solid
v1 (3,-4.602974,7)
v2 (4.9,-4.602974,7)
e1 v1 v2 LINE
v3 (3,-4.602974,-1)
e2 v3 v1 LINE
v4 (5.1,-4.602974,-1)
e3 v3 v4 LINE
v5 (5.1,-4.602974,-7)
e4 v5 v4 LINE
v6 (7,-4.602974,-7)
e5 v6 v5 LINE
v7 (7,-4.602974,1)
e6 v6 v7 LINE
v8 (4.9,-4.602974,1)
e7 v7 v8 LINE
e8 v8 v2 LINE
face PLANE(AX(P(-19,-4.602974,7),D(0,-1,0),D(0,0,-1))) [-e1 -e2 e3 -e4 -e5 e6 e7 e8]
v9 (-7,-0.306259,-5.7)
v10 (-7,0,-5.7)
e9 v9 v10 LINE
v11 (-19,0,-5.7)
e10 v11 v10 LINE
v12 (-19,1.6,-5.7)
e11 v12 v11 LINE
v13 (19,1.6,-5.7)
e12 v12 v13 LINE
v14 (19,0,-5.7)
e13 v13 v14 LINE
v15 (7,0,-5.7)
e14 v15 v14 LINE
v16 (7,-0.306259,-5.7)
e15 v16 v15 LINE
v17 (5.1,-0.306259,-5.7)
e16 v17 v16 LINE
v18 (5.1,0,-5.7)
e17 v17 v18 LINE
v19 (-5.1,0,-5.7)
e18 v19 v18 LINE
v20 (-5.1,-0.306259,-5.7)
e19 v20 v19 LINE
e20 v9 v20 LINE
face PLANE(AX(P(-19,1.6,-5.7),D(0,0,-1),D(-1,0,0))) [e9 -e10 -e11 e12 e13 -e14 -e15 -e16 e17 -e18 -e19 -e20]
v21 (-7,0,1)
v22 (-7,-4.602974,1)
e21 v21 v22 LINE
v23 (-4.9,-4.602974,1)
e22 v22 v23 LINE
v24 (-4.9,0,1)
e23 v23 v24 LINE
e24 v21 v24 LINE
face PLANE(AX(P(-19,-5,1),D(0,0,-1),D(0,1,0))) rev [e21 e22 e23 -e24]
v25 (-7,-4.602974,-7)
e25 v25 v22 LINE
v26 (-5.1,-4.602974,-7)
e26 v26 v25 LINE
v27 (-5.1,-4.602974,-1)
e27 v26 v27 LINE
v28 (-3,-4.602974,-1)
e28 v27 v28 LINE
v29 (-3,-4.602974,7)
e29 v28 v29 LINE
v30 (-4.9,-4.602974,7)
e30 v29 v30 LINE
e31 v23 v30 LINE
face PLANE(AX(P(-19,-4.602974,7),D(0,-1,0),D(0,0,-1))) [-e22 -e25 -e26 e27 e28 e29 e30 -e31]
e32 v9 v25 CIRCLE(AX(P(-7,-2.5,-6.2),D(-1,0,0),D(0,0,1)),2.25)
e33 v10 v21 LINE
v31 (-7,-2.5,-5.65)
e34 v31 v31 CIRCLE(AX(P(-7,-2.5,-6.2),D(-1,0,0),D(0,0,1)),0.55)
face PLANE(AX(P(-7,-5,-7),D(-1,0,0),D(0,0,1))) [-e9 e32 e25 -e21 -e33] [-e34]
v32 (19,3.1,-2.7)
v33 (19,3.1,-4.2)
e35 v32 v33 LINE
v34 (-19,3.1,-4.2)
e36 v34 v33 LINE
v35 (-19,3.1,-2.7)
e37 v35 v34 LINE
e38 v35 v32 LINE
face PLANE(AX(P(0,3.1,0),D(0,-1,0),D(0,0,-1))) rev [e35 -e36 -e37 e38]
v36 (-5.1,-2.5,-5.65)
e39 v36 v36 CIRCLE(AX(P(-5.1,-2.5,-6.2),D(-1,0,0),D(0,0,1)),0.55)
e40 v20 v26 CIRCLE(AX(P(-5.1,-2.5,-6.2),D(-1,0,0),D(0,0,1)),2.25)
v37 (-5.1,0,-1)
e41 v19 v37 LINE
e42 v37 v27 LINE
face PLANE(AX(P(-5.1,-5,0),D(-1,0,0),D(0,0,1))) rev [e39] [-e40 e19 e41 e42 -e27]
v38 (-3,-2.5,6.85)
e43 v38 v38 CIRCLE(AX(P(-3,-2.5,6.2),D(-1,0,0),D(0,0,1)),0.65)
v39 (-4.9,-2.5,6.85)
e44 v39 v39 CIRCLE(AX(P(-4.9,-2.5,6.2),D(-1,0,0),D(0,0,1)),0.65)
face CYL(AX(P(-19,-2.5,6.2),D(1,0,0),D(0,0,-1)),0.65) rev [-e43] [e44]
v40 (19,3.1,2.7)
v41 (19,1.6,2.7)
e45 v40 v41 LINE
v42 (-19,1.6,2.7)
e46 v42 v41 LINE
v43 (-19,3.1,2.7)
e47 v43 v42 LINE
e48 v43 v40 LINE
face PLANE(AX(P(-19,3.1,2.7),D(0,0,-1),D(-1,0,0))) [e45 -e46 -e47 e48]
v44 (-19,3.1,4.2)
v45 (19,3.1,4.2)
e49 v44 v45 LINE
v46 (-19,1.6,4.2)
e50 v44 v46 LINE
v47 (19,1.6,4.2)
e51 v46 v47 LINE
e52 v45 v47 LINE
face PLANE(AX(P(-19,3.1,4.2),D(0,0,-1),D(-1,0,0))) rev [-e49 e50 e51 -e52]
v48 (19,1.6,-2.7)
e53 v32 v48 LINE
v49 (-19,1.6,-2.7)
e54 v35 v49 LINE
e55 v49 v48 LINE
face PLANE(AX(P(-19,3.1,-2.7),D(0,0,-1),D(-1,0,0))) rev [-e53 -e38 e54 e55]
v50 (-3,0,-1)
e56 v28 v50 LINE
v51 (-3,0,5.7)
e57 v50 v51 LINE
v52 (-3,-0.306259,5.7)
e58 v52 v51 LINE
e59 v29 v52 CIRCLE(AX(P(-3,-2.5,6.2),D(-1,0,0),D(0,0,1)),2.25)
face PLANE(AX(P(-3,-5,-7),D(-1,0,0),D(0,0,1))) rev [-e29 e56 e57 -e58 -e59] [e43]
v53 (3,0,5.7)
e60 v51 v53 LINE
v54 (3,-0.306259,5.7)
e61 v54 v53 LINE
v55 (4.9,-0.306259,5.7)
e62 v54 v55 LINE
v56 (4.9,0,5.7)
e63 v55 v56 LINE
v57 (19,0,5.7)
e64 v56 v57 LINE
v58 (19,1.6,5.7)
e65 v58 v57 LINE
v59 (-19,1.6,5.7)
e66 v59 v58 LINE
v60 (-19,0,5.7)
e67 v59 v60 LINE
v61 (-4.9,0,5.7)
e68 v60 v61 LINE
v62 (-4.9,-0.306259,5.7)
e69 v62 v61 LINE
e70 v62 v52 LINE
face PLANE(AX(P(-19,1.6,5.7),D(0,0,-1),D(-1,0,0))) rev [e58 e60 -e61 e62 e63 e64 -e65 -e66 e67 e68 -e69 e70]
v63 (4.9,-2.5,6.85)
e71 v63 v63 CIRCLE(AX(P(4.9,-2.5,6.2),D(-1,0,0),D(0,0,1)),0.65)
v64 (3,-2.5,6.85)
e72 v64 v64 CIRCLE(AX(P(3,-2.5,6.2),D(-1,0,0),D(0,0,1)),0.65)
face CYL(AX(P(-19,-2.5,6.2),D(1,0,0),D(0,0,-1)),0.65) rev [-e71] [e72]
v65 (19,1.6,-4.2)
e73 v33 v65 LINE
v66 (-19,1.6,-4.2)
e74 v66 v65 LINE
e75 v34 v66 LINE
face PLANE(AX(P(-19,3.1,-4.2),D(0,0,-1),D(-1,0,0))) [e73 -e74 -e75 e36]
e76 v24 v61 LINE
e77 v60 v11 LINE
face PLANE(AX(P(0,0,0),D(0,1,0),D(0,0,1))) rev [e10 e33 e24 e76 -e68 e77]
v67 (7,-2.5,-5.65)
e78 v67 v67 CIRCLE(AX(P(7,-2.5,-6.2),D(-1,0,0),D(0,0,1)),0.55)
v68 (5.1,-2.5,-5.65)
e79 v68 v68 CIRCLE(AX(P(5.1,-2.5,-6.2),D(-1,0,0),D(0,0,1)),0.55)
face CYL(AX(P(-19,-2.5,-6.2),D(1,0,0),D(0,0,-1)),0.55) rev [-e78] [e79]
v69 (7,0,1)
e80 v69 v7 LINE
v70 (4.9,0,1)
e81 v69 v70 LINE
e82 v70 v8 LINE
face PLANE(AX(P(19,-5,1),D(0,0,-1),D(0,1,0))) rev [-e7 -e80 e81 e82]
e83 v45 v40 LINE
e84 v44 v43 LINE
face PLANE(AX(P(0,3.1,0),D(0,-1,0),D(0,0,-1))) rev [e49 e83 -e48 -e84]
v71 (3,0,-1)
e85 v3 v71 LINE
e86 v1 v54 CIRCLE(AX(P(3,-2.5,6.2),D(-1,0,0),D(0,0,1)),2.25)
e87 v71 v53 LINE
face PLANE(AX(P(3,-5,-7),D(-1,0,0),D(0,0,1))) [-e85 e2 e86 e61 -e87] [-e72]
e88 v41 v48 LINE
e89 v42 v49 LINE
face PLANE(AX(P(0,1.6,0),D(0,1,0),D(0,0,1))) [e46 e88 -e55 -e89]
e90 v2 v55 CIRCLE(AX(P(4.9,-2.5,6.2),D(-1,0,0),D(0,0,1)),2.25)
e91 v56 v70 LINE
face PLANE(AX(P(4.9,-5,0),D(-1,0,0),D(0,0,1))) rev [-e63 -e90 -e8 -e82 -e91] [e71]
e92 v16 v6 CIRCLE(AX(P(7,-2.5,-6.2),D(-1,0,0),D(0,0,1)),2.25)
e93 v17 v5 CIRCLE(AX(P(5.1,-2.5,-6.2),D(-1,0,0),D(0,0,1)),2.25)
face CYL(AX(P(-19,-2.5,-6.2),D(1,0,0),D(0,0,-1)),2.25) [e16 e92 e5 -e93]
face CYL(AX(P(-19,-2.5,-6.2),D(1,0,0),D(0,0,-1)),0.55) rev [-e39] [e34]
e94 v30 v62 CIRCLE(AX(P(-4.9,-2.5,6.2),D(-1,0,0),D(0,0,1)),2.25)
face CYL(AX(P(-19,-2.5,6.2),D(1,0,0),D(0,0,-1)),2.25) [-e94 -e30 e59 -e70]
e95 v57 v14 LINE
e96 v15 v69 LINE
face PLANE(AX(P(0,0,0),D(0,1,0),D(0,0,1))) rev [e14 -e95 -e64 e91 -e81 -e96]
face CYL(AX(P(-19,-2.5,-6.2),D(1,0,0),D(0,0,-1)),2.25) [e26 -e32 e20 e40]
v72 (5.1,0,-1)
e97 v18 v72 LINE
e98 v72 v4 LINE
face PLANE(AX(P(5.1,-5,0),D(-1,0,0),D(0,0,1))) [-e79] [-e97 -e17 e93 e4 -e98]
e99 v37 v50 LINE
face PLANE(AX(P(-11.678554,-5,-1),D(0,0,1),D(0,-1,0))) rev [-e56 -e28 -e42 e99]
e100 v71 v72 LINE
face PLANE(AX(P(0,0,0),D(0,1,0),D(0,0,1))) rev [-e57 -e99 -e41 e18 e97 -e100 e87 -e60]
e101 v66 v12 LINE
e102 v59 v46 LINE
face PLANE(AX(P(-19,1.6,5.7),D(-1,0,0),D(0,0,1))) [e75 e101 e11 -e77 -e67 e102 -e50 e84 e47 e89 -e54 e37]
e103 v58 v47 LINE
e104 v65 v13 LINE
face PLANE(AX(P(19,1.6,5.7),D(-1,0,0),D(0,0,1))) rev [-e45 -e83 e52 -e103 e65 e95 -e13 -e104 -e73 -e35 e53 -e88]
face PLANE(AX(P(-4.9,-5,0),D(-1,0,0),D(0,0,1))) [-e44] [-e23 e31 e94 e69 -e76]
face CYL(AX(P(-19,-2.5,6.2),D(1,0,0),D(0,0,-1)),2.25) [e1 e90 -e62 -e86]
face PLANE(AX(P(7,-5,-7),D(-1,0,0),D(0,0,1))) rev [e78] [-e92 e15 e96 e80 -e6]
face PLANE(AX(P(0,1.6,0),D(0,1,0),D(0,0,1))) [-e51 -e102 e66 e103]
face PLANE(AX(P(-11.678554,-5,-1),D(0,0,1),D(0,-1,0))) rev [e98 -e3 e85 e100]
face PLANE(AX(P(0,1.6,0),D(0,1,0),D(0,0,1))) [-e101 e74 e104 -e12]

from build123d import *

# Parameters (mm, degrees)
SKETCH_1_W                = 38
SKETCH_1_H                = 11.4
EXTRUDE_1_DEPTH           = 1.6
SKETCH_1_4_W              = 4
SKETCH_1_4_H              = 14
EXTRUDE_2_DEPTH           = 5
SKETCH_2_W                = 0.1
SKETCH_2_H                = 1.3
SKETCH_2_W_2              = 10
SKETCH_2_W_3              = 2
CUT_EXTRUDE_1_DEPTH       = 21.856653615
CUT_EXTRUDE_START         = 7
CUT_EXTRUDE_2_DEPTH       = 2.1
CUT_EXTRUDE_START_2       = -4.9
CUT_EXTRUDE_3_DEPTH       = 2.1
CUT_EXTRUDE_6_DEPTH       = 21.856653615
CUT_EXTRUDE_6_DEPTH_BACK  = 21.856653615
EXTRUDE_START             = 5.1
SKETCH_4_6_R              = 2.25
EXTRUDE_3_DEPTH           = 1.9
EXTRUDE_START_2           = -7
SKETCH_4_7_R              = 2.25
EXTRUDE_4_DEPTH           = 1.9
CUT_EXTRUDE_7_DEPTH       = 22.386970332
CUT_EXTRUDE_7_DEPTH_BACK  = 22.386970332
SKETCH_3_R                = 0.65
SKETCH_3_R_2              = 0.55
CUT_EXTRUDE_START_3       = 3
CUT_EXTRUDE_8_DEPTH       = 2.1
CUT_EXTRUDE_START_4       = -5.1
SKETCH_5_2_R              = 2.5
SKETCH_5_2_W              = 2.5
SKETCH_5_2_H              = 2.5
CUT_EXTRUDE_9_DEPTH       = 5.1
CUT_EXTRUDE_10_DEPTH      = 22.386970332
CUT_EXTRUDE_10_DEPTH_BACK = 22.386970332
EXTRUDE_START_3           = 3
EXTRUDE_5_DEPTH           = 1.9
EXTRUDE_START_4           = -4.9
EXTRUDE_6_DEPTH           = 1.9
CUT_EXTRUDE_11_DEPTH      = 22.386970332
CUT_EXTRUDE_11_DEPTH_BACK = 22.386970332
SKETCH_3_3_R              = 0.65
SKETCH_3_3_R_2            = 0.55
CUT_EXTRUDE_12_DEPTH      = 22.386970332
CUT_EXTRUDE_12_DEPTH_BACK = 22.386970332
SKETCH_9_W                = 15.45
SKETCH_9_H                = 0.397025916
SKETCH_10_W               = 38
SKETCH_10_H               = 1.5
EXTRUDE_7_DEPTH           = 1.5
FILLET_1_R                = 1
SKETCH_11_W               = 4.7
SKETCH_11_H               = 4.602974084
CUT_EXTRUDE_13_DEPTH      = 17.397649411
CUT_EXTRUDE_START_5       = 4.9
SKETCH_11_2_W             = 4.7
SKETCH_11_2_H             = 4.602974084
CUT_EXTRUDE_14_DEPTH      = 17.397649411
CUT_EXTRUDE_START_6       = 5.1
SKETCH_11_4_W             = 4.7
SKETCH_11_4_H             = 4.602974084
CUT_EXTRUDE_15_DEPTH      = 10.2


# Read off the part's stored shape, not the designer's step: 切除-拉伸8, 凸台-拉伸5, 凸台-拉伸6
with BuildPart() as part:
    # 草图1 → 凸台-拉伸1 (new body)
    with BuildSketch(Plane(origin=(0, 0, 0), x_dir=(1, 0, 0), z_dir=(0, 1, 0))):
        Rectangle(SKETCH_1_W, SKETCH_1_H)
    extrude(amount=EXTRUDE_1_DEPTH)

    # 草图1<4> → 凸台-拉伸2 (add)
    with BuildSketch(Plane(origin=(0, 0, 0), x_dir=(1, 0, 0), z_dir=(0, 1, 0))):
        with Locations((-5, 0)):
            Rectangle(SKETCH_1_4_W, SKETCH_1_4_H)
        with Locations((5, 0)):
            Rectangle(SKETCH_1_4_W, SKETCH_1_4_H)
    extrude(amount=-EXTRUDE_2_DEPTH)

    # 草图2 → 切除-拉伸1 (cut, through all)
    with BuildSketch(Plane(origin=(0, 0, 0), x_dir=(1, 0, 0), z_dir=(0, 1, 0))):
        with Locations((-5.05, 6.35)):
            Rectangle(SKETCH_2_W, SKETCH_2_H)
        with Locations((0, 6.35)):
            Rectangle(SKETCH_2_W_2, SKETCH_2_H)
        with Locations((5.05, 6.35)):
            Rectangle(SKETCH_2_W, SKETCH_2_H)
        with Locations((-6, -6.35)):
            Rectangle(SKETCH_2_W_3, SKETCH_2_H)
        with Locations((-4.95, -6.35)):
            Rectangle(SKETCH_2_W, SKETCH_2_H)
        with Locations((4.95, -6.35)):
            Rectangle(SKETCH_2_W, SKETCH_2_H)
        with Locations((6, -6.35)):
            Rectangle(SKETCH_2_W_3, SKETCH_2_H)
    extrude(amount=-CUT_EXTRUDE_1_DEPTH, mode=Mode.SUBTRACT)

    # 草图4 → 切除-拉伸2 (cut)
    with BuildSketch(Plane(origin=(0, 0, 0), x_dir=(0, 0, -1), z_dir=(1, 0, 0)).offset(CUT_EXTRUDE_START)):
        with BuildLine():
            ThreePointArc((-3.7, -2.5), (-4.263508327, -0.91886117), (-5.7, -0.050510257))
            Line((-5.7, -0.050510257), (-5.7, -5))
            Line((-5.7, -5), (-3.7, -5))
            Line((-3.7, -5), (-3.7, -2.5))
        make_face()
    extrude(amount=-CUT_EXTRUDE_2_DEPTH, mode=Mode.SUBTRACT)

    # 草图4<3> → 切除-拉伸3 (cut)
    with BuildSketch(Plane(origin=(0, 0, 0), x_dir=(0, 0, -1), z_dir=(1, 0, 0)).offset(CUT_EXTRUDE_START_2)):
        with BuildLine():
            ThreePointArc((-3.7, -2.5), (-4.263508327, -0.91886117), (-5.7, -0.050510257))
            Line((-5.7, -0.050510257), (-5.7, -5))
            Line((-5.7, -5), (-3.7, -5))
            Line((-3.7, -5), (-3.7, -2.5))
        make_face()
    extrude(amount=-CUT_EXTRUDE_3_DEPTH, mode=Mode.SUBTRACT)

    # 草图4<5> → 切除-拉伸6 (cut, two sides: drawn at the far end of the back side and taken through both)
    with BuildSketch(Plane(origin=(0, 0, 0), x_dir=(0, 0, -1), z_dir=(1, 0, 0)).offset(-CUT_EXTRUDE_6_DEPTH_BACK)):
        with BuildLine():
            Line((8.45, 0), (5.7, 0))
            Line((5.7, 0), (5.7, -0.306258903))
            ThreePointArc((5.7, -0.306258903), (7.60312152, -0.74109409), (8.45, -2.5))
            Line((8.45, -2.5), (8.45, 0))
        make_face()
        with BuildLine():
            Line((8.45, -5), (8.45, -2.5))
            ThreePointArc((8.45, -2.5), (7.60312152, -4.25890591), (5.7, -4.693741097))
            Line((5.7, -4.693741097), (5.7, -5))
            Line((5.7, -5), (8.45, -5))
        make_face()
    extrude(amount=CUT_EXTRUDE_6_DEPTH + CUT_EXTRUDE_6_DEPTH_BACK, mode=Mode.SUBTRACT)

    # 草图4<6> → 凸台-拉伸3 (add)
    with BuildSketch(Plane(origin=(0, 0, 0), x_dir=(0, 0, -1), z_dir=(1, 0, 0)).offset(EXTRUDE_START)):
        with Locations((6.2, -2.5)):
            Circle(SKETCH_4_6_R)
    extrude(amount=EXTRUDE_3_DEPTH)

    # 草图4<7> → 凸台-拉伸4 (add)
    with BuildSketch(Plane(origin=(0, 0, 0), x_dir=(0, 0, -1), z_dir=(1, 0, 0)).offset(EXTRUDE_START_2)):
        with Locations((6.2, -2.5)):
            Circle(SKETCH_4_7_R)
    extrude(amount=EXTRUDE_4_DEPTH)

    # 草图3 → 切除-拉伸7 (cut, two sides: drawn at the far end of the back side and taken through both)
    with BuildSketch(Plane(origin=(0, 0, 0), x_dir=(0, 0, -1), z_dir=(1, 0, 0)).offset(-CUT_EXTRUDE_7_DEPTH_BACK)):
        with Locations(Location((-6.2, -2.5, 0), (0, 0, 180))):
            Circle(SKETCH_3_R)
        with Locations(Location((6.2, -2.5, 0), (0, 0, 204.619977329))):
            Circle(SKETCH_3_R_2)
    extrude(amount=CUT_EXTRUDE_7_DEPTH + CUT_EXTRUDE_7_DEPTH_BACK, mode=Mode.SUBTRACT)

    # 切除-拉伸8 outline → 切除-拉伸8 (cut)
    with BuildSketch(Plane(origin=(0, 0, 0), x_dir=(0, 0, -1), z_dir=(1, 0, 0)).offset(CUT_EXTRUDE_START_3)):
        with BuildLine():
            Line((3.7, -2.5), (3.7, -5))
            Line((3.7, -5), (5.7, -5))
            Line((5.7, -5), (5.7, -2.729128785))
            ThreePointArc((5.7, -2.729128785), (5.65, -2.5), (5.7, -2.270871215))
            Line((5.7, -2.270871215), (5.7, -0.050510257))
            ThreePointArc((5.7, -0.050510257), (4.263508327, -0.91886117), (3.7, -2.5))
        make_face()
    extrude(amount=CUT_EXTRUDE_8_DEPTH, mode=Mode.SUBTRACT)

    # 草图5<2> → 切除-拉伸9 (cut)
    with BuildSketch(Plane(origin=(0, 0, 0), x_dir=(0, 0, -1), z_dir=(1, 0, 0)).offset(CUT_EXTRUDE_START_4)):
        with Locations((6.2, -2.5)):
            Circle(SKETCH_5_2_R)
        with Locations((4.95, -3.75)):
            Rectangle(SKETCH_5_2_W, SKETCH_5_2_H)
    extrude(amount=CUT_EXTRUDE_9_DEPTH, mode=Mode.SUBTRACT)

    # 草图7 → 切除-拉伸10 (cut, two sides: drawn at the far end of the back side and taken through both)
    with BuildSketch(Plane(origin=(0, 0, 0), x_dir=(0, 0, -1), z_dir=(1, 0, 0)).offset(-CUT_EXTRUDE_10_DEPTH_BACK)):
        with BuildLine():
            Line((-5.7, -0.306258903), (-5.7, 0))
            Line((-5.7, 0), (-8.45, 0))
            Line((-8.45, 0), (-8.45, -2.5))
            ThreePointArc((-8.45, -2.5), (-7.60312152, -0.74109409), (-5.7, -0.306258903))
        make_face()
    extrude(amount=CUT_EXTRUDE_10_DEPTH + CUT_EXTRUDE_10_DEPTH_BACK, mode=Mode.SUBTRACT)

    # 凸台-拉伸5 outline → 凸台-拉伸5 (add)
    with BuildSketch(Plane(origin=(0, 0, 0), x_dir=(0, 0, -1), z_dir=(1, 0, 0)).offset(EXTRUDE_START_3)):
        with BuildLine():
            Line((-7, -4.602974084), (-7, -0.397025915))
            ThreePointArc((-7, -0.397025915), (-8.45, -2.5), (-7, -4.602974084))
        make_face()
        with BuildLine():
            ThreePointArc((-5.7, -2.084668807), (-6.85, -2.5), (-5.7, -2.915331193))
            Line((-5.7, -2.915331193), (-5.7, -2.084668807))
        make_face()
    extrude(amount=EXTRUDE_5_DEPTH)

    # 凸台-拉伸6 outline → 凸台-拉伸6 (add)
    with BuildSketch(Plane(origin=(0, 0, 0), x_dir=(0, 0, -1), z_dir=(1, 0, 0)).offset(EXTRUDE_START_4)):
        with BuildLine():
            Line((-7, -4.602974084), (-7, -0.397025915))
            ThreePointArc((-7, -0.397025915), (-8.45, -2.5), (-7, -4.602974084))
        make_face()
        with BuildLine():
            ThreePointArc((-5.7, -2.084668807), (-6.85, -2.5), (-5.7, -2.915331193))
            Line((-5.7, -2.915331193), (-5.7, -2.084668807))
        make_face()
    extrude(amount=EXTRUDE_6_DEPTH)

    # 草图3<3> → 切除-拉伸11 (cut, two sides: drawn at the far end of the back side and taken through both)
    with BuildSketch(Plane(origin=(0, 0, 0), x_dir=(0, 0, -1), z_dir=(1, 0, 0)).offset(-CUT_EXTRUDE_11_DEPTH_BACK)):
        with Locations(Location((-6.2, -2.5, 0), (0, 0, 180))):
            Circle(SKETCH_3_3_R)
        with Locations(Location((6.2, -2.5, 0), (0, 0, 180))):
            Circle(SKETCH_3_3_R_2)
    extrude(amount=CUT_EXTRUDE_11_DEPTH + CUT_EXTRUDE_11_DEPTH_BACK, mode=Mode.SUBTRACT)

    # 草图9 → 切除-拉伸12 (cut, two sides: drawn at the far end of the back side and taken through both)
    with BuildSketch(Plane(origin=(0, 0, 0), x_dir=(0, 0, -1), z_dir=(1, 0, 0)).offset(-CUT_EXTRUDE_12_DEPTH_BACK)):
        with Locations((0.725, -4.801487042)):
            Rectangle(SKETCH_9_W, SKETCH_9_H)
    extrude(amount=CUT_EXTRUDE_12_DEPTH + CUT_EXTRUDE_12_DEPTH_BACK, mode=Mode.SUBTRACT)

    # 草图10 → 凸台-拉伸7 (add)
    with BuildSketch(Plane(origin=(0, 1.6, 0), x_dir=(1, 0, 0), z_dir=(0, 1, 0))):
        with Locations((0, 3.45)):
            Rectangle(SKETCH_10_W, SKETCH_10_H)
        with Locations((0, -3.45)):
            Rectangle(SKETCH_10_W, SKETCH_10_H)
    extrude(amount=EXTRUDE_7_DEPTH)

    # 圆角1
    fillet_1_edges = [part.edges().sort_by_distance(p)[0] for p in [
        (5.95, -4.602974084, 3.7),
        (4.05, -4.602974084, -3.7),
        (-4.05, -4.602974084, -3.7),
        (-5.95, -4.602974084, 3.7),
    ]]
    fillet(fillet_1_edges, radius=FILLET_1_R)

    # 草图11 → 切除-拉伸13 (cut, through all)
    with BuildSketch(Plane(origin=(0, 0, 0), x_dir=(0, 0, -1), z_dir=(1, 0, 0)).offset(CUT_EXTRUDE_START_2)):
        with Locations((-3.35, -2.301487042)):
            Rectangle(SKETCH_11_W, SKETCH_11_H)
    extrude(amount=-CUT_EXTRUDE_13_DEPTH, mode=Mode.SUBTRACT)

    # 草图11<2> → 切除-拉伸14 (cut, through all)
    with BuildSketch(Plane(origin=(0, 0, 0), x_dir=(0, 0, -1), z_dir=(1, 0, 0)).offset(CUT_EXTRUDE_START_5)):
        with Locations((-3.35, -2.301487042)):
            Rectangle(SKETCH_11_2_W, SKETCH_11_2_H)
    extrude(amount=CUT_EXTRUDE_14_DEPTH, mode=Mode.SUBTRACT)

    # 草图11<4> → 切除-拉伸15 (cut)
    with BuildSketch(Plane(origin=(0, 0, 0), x_dir=(0, 0, -1), z_dir=(1, 0, 0)).offset(CUT_EXTRUDE_START_6)):
        with Locations((3.35, -2.301487042)):
            Rectangle(SKETCH_11_4_W, SKETCH_11_4_H)
    extrude(amount=-CUT_EXTRUDE_15_DEPTH, mode=Mode.SUBTRACT)


solid = part.part
